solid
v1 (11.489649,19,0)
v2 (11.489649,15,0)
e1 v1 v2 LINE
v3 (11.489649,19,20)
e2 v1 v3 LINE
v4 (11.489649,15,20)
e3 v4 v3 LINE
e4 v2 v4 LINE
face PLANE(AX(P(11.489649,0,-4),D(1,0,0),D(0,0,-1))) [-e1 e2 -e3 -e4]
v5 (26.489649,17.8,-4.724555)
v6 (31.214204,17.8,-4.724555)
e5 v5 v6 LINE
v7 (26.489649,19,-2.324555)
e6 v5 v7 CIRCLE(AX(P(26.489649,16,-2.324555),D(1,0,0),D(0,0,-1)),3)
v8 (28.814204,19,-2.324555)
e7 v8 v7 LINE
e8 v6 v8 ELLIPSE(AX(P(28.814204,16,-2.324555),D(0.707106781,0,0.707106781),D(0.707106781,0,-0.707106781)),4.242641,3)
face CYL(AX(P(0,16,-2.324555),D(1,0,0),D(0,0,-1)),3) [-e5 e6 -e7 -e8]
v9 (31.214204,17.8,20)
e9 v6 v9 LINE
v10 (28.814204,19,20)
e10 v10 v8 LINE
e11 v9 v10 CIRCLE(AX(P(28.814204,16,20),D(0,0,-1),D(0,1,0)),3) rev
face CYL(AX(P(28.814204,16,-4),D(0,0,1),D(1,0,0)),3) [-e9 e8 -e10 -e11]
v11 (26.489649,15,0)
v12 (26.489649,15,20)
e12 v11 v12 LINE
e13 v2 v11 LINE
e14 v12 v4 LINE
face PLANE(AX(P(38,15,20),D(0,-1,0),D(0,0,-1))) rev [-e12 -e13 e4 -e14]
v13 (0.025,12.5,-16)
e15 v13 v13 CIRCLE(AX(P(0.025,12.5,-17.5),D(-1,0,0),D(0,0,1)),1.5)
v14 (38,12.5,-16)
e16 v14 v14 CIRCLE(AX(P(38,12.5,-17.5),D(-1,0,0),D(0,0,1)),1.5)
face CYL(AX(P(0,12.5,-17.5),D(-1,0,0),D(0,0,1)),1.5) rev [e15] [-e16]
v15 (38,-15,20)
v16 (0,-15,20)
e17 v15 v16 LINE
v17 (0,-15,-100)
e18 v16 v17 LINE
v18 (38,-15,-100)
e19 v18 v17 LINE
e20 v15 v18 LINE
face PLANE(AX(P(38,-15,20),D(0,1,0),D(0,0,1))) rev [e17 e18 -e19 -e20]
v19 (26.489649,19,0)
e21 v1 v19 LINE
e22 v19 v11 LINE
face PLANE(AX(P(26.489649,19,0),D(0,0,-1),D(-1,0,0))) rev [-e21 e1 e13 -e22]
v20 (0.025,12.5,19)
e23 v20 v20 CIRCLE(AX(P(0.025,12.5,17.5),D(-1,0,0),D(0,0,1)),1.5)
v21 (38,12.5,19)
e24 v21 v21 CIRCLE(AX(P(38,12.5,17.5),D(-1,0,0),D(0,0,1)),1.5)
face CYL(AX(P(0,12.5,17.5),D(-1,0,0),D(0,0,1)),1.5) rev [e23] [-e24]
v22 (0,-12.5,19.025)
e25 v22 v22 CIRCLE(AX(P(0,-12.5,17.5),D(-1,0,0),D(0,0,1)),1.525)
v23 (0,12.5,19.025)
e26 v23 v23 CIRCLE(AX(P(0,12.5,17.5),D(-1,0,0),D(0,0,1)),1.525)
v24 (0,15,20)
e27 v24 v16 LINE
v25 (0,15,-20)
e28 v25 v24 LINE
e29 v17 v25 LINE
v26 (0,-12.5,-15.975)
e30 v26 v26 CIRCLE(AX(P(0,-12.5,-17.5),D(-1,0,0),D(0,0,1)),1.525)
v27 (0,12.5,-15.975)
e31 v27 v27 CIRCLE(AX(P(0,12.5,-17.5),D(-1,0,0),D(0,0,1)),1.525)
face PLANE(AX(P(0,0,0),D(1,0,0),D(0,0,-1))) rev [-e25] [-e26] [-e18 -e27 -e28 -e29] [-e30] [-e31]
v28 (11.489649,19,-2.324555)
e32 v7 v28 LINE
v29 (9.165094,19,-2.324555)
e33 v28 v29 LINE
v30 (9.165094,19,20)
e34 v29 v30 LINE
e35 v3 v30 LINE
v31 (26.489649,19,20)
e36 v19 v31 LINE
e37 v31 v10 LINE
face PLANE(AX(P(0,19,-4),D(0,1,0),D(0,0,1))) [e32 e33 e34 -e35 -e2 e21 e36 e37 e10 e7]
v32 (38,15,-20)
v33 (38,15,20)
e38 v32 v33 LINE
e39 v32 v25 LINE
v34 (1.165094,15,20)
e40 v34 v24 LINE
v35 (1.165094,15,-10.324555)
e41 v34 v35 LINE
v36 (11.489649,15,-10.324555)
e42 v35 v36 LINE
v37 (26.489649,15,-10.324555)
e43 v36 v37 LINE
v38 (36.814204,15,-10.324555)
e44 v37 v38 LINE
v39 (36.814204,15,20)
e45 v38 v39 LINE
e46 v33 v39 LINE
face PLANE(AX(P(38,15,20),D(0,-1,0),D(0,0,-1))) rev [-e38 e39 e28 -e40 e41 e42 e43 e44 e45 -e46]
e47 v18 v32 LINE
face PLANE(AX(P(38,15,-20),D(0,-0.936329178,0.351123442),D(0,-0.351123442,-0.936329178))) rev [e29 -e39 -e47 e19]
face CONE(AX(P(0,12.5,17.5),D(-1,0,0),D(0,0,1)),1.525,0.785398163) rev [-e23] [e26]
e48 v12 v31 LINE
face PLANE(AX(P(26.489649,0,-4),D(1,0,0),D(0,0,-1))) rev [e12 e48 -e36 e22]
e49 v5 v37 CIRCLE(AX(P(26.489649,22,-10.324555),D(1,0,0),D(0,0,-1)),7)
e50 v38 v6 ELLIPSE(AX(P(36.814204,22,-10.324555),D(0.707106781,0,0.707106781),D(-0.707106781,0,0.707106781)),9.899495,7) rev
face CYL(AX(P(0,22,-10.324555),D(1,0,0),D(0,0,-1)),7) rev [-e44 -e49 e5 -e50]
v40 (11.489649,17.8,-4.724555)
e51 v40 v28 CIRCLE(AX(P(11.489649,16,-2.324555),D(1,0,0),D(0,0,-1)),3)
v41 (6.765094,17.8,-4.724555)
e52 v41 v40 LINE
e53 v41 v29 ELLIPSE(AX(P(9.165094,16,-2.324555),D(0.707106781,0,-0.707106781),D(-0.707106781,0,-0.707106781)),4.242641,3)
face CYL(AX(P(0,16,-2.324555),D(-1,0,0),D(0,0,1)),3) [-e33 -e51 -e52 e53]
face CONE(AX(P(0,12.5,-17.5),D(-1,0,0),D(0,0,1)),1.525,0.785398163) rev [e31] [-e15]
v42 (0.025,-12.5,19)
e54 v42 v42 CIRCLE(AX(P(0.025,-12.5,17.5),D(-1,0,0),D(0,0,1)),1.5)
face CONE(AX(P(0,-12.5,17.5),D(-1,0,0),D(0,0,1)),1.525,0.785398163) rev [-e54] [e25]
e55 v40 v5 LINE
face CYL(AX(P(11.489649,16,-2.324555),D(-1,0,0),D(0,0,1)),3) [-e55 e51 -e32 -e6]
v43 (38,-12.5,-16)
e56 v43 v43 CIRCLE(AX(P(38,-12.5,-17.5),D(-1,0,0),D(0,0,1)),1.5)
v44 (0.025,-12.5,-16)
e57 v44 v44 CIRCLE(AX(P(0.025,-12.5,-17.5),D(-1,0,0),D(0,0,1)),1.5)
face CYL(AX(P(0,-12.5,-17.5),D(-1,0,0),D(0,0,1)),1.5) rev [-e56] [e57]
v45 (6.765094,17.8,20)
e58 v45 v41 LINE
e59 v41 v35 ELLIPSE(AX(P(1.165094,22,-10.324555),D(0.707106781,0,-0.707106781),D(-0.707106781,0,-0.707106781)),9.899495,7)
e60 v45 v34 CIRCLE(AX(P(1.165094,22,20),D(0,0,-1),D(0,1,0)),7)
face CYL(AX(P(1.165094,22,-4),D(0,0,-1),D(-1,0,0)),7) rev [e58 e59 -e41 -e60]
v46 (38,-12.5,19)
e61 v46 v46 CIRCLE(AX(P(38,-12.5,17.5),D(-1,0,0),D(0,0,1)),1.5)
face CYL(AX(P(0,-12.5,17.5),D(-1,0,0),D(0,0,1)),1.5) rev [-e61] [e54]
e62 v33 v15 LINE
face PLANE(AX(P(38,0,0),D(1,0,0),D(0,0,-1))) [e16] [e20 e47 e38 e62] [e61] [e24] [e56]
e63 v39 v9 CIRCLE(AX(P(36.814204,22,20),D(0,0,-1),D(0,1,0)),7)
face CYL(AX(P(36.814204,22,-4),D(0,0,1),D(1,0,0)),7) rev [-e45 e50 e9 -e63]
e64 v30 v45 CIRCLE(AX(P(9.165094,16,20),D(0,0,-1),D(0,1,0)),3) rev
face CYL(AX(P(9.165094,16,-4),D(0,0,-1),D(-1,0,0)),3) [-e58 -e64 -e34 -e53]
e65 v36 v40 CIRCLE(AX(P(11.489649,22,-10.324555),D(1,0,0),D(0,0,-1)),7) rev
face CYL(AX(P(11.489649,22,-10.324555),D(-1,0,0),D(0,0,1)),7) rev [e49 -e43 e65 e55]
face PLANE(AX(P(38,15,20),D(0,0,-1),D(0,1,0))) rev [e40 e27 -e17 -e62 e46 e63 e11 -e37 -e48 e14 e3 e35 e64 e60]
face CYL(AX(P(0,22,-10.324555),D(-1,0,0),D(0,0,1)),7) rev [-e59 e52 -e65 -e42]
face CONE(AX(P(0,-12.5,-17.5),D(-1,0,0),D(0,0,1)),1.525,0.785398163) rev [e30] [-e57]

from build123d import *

# Parameters (mm, degrees)
BOSS_EXTRUDE1_DEPTH                = 38
F_3_0_3_DIAMETER_HOLE1_D           = 3
F_3_0_3_DIAMETER_HOLE1_CSINK_D     = 3.05
F_3_0_3_DIAMETER_HOLE1_CSINK_ANGLE = 90
SKETCH6_W                          = 4
SKETCH6_H                          = 4
BOSS_EXTRUDE2_DEPTH                = 24
FILLET2_R                          = 7
FILLET3_START                      = 7.489649075
FILLET3_DEPTH                      = 4
FILLET3_START_2                    = 26.489649075
FILLET3_2_DEPTH                    = 4
FILLET3_START_3                    = 1.165093755
FILLET3_3_DEPTH                    = 6.32455532
FILLET3_START_4                    = 30.489649075
FILLET3_4_DEPTH                    = 6.324555321
FILLET3_START_5                    = -11
FILLET3_5_DEPTH                    = 7
SKETCH7_W                          = 15
SKETCH7_H                          = 4
BOSS_EXTRUDE3_DEPTH                = 4
FILLET4_R                          = 7
FILLET5_R                          = 3


with BuildPart() as part:
    # Sketch1 → Boss-Extrude1 (new body)
    with BuildSketch(Plane(origin=(0, 0, 0), x_dir=(0, 0, -1), z_dir=(1, 0, 0))):
        Polygon((-20, 15), (20, 15), (100, -15), (20, -15), (-20, -15), align=None)
    extrude(amount=BOSS_EXTRUDE1_DEPTH)

    # Ø3.0 (3) Diameter Hole1 (through all)
    with Locations(Plane.ZY):
        with Locations((17.5, 12.5), (-17.5, 12.5), (-17.5, -12.5), (17.5, -12.5)):
            CounterSinkHole(F_3_0_3_DIAMETER_HOLE1_D / 2, F_3_0_3_DIAMETER_HOLE1_CSINK_D / 2, counter_sink_angle=F_3_0_3_DIAMETER_HOLE1_CSINK_ANGLE)

    # Sketch6 → Boss-Extrude2 (add)
    with BuildSketch(Plane.XY.offset(20)):
        with Locations((9.489649075, 17)):
            Rectangle(SKETCH6_W, SKETCH6_H)
        with Locations((28.489649075, 17)):
            Rectangle(SKETCH6_W, SKETCH6_H)
    extrude(amount=-BOSS_EXTRUDE2_DEPTH)

    # Fillet2
    # the kernel refuses this fillet: 7 mm, written as the material it adds along each edge
    with BuildSketch(Plane(origin=(30.489649075, 15, 20), x_dir=(1, 0, 0), z_dir=(0, 0, -1))) as fillet2_piece_1:
        with BuildLine():
            CenterArc((6.32455532, -7), FILLET2_R, 90, 64.623066475)
            Line((0, -4), (-0.126491106, -3.94))
            ThreePointArc((-0.126491106, -3.94), (-0.14, -2), (-0.14, 0))
            Line((-0.14, 0), (0, 0.14))
            Line((0, 0.14), (6.32455532, 0.14))
            Line((6.32455532, 0.14), (6.32455532, 0))
        make_face()
    extrude(amount=24)
    with BuildSketch(Plane(origin=(7.489649075, 15, 20), x_dir=(-1, 0, 0), z_dir=(0, 0, -1))) as fillet2_piece_2:
        with BuildLine():
            CenterArc((6.32455532, 7), FILLET2_R, 205.376933525, 64.623066475)
            Line((0, 4), (-0.126491106, 3.94))
            ThreePointArc((-0.126491106, 3.94), (-0.14, 2), (-0.14, 0))
            Line((-0.14, 0), (0, -0.14))
            Line((0, -0.14), (6.32455532, -0.14))
            Line((6.32455532, -0.14), (6.32455532, 0))
        make_face()
    extrude(amount=24)

    # Fillet3: read off the stored shape, not the designer's step
    # Fillet3 outline → Fillet3 (add)
    with BuildSketch(Plane.YZ.offset(FILLET3_START)):
        with BuildLine():
            Line((15, -4), (15, -10.32455532))
            ThreePointArc((15, -10.32455532), (16.083920217, -6.582897934), (19, -4))
            Line((19, -4), (15, -4))
        make_face()
    extrude(amount=FILLET3_DEPTH)

    # Fillet3 2 outline → Fillet3 2 (add)
    with BuildSketch(Plane.YZ.offset(FILLET3_START_2)):
        with BuildLine():
            Line((15, -4), (15, -10.32455532))
            ThreePointArc((15, -10.32455532), (16.083920217, -6.582897934), (19, -4))
            Line((19, -4), (15, -4))
        make_face()
    extrude(amount=FILLET3_2_DEPTH)

    # Fillet3 3 outline → Fillet3 3 (add)
    with BuildSketch(Plane.YZ.offset(FILLET3_START_3)):
        with BuildLine():
            Line((15, -4), (15, -10.32455532))
            ThreePointArc((15, -10.32455532), (16.083920217, -6.582897934), (19, -4))
            Line((19, -4), (15, -4))
        make_face()
    extrude(amount=FILLET3_3_DEPTH)

    # Fillet3 4 outline → Fillet3 4 (add)
    with BuildSketch(Plane.YZ.offset(FILLET3_START_4)):
        with BuildLine():
            Line((15, -4), (15, -10.32455532))
            ThreePointArc((15, -10.32455532), (16.083920217, -6.582897934), (19, -4))
            Line((19, -4), (15, -4))
        make_face()
    extrude(amount=FILLET3_4_DEPTH)

    # Fillet3 5 outline → Fillet3 5 (cut)
    with BuildSketch(Plane.XY.offset(FILLET3_START_5)):
        with BuildLine():
            Line((30.015307426, 20), (30.489649075, 19))
            ThreePointArc((30.489649075, 19), (33.072547009, 16.083920217), (36.814204396, 15))
            Line((36.814204396, 15), (36.814204396, 20))
            Line((36.814204396, 20), (30.015307426, 20))
        make_face()
        with BuildLine():
            Line((7.489649075, 19), (7.963990724, 20))
            Line((7.963990724, 20), (1.165093755, 20))
            Line((1.165093755, 20), (1.165093755, 15))
            ThreePointArc((1.165093755, 15), (4.906751142, 16.083920217), (7.489649075, 19))
        make_face()
    extrude(amount=FILLET3_5_DEPTH, mode=Mode.SUBTRACT)

    # Sketch7 → Boss-Extrude3 (add)
    with BuildSketch(Plane(origin=(0, 15, 0), x_dir=(1, 0, 0), z_dir=(0, 1, 0))):
        with Locations((18.989649075, 2)):
            Rectangle(SKETCH7_W, SKETCH7_H)
    extrude(amount=BOSS_EXTRUDE3_DEPTH)

    # Fillet4
    # the kernel refuses this fillet: 7 mm, written as the material it adds along each edge
    with BuildSketch(Plane(origin=(11.489649075, 15, -4), x_dir=(0, 0, -1), z_dir=(1, 0, 0))) as fillet4_piece_1:
        with BuildLine():
            CenterArc((6.32455532, 7), FILLET4_R, 205.376933525, 64.623066475)
            Line((0, 4), (-0.126491106, 3.94))
            ThreePointArc((-0.126491106, 3.94), (-0.14, 2), (-0.14, 0))
            Line((-0.14, 0), (0, -0.14))
            Line((0, -0.14), (6.32455532, -0.14))
            Line((6.32455532, -0.14), (6.32455532, 0))
        make_face()
    extrude(amount=15)

    # Fillet5
    # the kernel refuses this fillet: 3 mm, written as the material it takes off along each edge
    with BuildSketch(Plane(origin=(30.489649075, 19, 24.188611699), x_dir=(-1, 0, 0), z_dir=(0, 0, -1))) as fillet5_piece_1:
        with BuildLine():
            CenterArc((1.67544468, -3), FILLET5_R, 90, 53.130102354)
            ThreePointArc((-0.72455532, -1.2), (-0.332163903, -0.618182569), (0, 0))
            Line((0, 0), (1.67544468, 0))
        make_face()
    extrude(amount=32.377223398, mode=Mode.SUBTRACT)
    with BuildSketch(Plane(origin=(34.678260774, 19, -4), x_dir=(0, 0, 1), z_dir=(-1, 0, 0)), Plane(origin=(11.489649075, 19, -4), x_dir=(0, 0, 1), z_dir=(-1, 0, 0))) as fillet5_piece_2:
        with BuildLine():
            CenterArc((1.675444679, -3), FILLET5_R, 90, 53.130102349)
            ThreePointArc((-0.72455532, -1.2), (-0.332163903, -0.618182569), (0, 0))
            Line((0, 0), (1.675444679, 0))
        make_face()
    extrude(amount=8.188611699, mode=Mode.SUBTRACT)
    with BuildSketch(Plane(origin=(11.489649075, 19, -4), x_dir=(0, -0.8560559167430235, -0.5168832241515113), z_dir=(1, 0, 0))) as fillet5_piece_3:
        with BuildLine():
            CenterArc((1.702158502, -2.984924004), FILLET5_R, 95.74648206, 53.130102354)
            Line((-0.866009248, -1.434274331), (0, 0))
            ThreePointArc((0, 0), (0.700888795, -0.035177325), (1.40177759, 0))
        make_face()
    extrude(amount=15, mode=Mode.SUBTRACT)
    with BuildSketch(Plane(origin=(7.489649075, 19, 24.188611699), x_dir=(1, 0, 0), z_dir=(0, 0, -1))) as fillet5_piece_4:
        with BuildLine():
            CenterArc((1.67544468, 3), FILLET5_R, 216.869897646, 53.130102354)
            ThreePointArc((-0.72455532, 1.2), (-0.332163903, 0.618182569), (0, 0))
            Line((0, 0), (1.67544468, 0))
        make_face()
    extrude(amount=32.377223398, mode=Mode.SUBTRACT)


solid = part.part
